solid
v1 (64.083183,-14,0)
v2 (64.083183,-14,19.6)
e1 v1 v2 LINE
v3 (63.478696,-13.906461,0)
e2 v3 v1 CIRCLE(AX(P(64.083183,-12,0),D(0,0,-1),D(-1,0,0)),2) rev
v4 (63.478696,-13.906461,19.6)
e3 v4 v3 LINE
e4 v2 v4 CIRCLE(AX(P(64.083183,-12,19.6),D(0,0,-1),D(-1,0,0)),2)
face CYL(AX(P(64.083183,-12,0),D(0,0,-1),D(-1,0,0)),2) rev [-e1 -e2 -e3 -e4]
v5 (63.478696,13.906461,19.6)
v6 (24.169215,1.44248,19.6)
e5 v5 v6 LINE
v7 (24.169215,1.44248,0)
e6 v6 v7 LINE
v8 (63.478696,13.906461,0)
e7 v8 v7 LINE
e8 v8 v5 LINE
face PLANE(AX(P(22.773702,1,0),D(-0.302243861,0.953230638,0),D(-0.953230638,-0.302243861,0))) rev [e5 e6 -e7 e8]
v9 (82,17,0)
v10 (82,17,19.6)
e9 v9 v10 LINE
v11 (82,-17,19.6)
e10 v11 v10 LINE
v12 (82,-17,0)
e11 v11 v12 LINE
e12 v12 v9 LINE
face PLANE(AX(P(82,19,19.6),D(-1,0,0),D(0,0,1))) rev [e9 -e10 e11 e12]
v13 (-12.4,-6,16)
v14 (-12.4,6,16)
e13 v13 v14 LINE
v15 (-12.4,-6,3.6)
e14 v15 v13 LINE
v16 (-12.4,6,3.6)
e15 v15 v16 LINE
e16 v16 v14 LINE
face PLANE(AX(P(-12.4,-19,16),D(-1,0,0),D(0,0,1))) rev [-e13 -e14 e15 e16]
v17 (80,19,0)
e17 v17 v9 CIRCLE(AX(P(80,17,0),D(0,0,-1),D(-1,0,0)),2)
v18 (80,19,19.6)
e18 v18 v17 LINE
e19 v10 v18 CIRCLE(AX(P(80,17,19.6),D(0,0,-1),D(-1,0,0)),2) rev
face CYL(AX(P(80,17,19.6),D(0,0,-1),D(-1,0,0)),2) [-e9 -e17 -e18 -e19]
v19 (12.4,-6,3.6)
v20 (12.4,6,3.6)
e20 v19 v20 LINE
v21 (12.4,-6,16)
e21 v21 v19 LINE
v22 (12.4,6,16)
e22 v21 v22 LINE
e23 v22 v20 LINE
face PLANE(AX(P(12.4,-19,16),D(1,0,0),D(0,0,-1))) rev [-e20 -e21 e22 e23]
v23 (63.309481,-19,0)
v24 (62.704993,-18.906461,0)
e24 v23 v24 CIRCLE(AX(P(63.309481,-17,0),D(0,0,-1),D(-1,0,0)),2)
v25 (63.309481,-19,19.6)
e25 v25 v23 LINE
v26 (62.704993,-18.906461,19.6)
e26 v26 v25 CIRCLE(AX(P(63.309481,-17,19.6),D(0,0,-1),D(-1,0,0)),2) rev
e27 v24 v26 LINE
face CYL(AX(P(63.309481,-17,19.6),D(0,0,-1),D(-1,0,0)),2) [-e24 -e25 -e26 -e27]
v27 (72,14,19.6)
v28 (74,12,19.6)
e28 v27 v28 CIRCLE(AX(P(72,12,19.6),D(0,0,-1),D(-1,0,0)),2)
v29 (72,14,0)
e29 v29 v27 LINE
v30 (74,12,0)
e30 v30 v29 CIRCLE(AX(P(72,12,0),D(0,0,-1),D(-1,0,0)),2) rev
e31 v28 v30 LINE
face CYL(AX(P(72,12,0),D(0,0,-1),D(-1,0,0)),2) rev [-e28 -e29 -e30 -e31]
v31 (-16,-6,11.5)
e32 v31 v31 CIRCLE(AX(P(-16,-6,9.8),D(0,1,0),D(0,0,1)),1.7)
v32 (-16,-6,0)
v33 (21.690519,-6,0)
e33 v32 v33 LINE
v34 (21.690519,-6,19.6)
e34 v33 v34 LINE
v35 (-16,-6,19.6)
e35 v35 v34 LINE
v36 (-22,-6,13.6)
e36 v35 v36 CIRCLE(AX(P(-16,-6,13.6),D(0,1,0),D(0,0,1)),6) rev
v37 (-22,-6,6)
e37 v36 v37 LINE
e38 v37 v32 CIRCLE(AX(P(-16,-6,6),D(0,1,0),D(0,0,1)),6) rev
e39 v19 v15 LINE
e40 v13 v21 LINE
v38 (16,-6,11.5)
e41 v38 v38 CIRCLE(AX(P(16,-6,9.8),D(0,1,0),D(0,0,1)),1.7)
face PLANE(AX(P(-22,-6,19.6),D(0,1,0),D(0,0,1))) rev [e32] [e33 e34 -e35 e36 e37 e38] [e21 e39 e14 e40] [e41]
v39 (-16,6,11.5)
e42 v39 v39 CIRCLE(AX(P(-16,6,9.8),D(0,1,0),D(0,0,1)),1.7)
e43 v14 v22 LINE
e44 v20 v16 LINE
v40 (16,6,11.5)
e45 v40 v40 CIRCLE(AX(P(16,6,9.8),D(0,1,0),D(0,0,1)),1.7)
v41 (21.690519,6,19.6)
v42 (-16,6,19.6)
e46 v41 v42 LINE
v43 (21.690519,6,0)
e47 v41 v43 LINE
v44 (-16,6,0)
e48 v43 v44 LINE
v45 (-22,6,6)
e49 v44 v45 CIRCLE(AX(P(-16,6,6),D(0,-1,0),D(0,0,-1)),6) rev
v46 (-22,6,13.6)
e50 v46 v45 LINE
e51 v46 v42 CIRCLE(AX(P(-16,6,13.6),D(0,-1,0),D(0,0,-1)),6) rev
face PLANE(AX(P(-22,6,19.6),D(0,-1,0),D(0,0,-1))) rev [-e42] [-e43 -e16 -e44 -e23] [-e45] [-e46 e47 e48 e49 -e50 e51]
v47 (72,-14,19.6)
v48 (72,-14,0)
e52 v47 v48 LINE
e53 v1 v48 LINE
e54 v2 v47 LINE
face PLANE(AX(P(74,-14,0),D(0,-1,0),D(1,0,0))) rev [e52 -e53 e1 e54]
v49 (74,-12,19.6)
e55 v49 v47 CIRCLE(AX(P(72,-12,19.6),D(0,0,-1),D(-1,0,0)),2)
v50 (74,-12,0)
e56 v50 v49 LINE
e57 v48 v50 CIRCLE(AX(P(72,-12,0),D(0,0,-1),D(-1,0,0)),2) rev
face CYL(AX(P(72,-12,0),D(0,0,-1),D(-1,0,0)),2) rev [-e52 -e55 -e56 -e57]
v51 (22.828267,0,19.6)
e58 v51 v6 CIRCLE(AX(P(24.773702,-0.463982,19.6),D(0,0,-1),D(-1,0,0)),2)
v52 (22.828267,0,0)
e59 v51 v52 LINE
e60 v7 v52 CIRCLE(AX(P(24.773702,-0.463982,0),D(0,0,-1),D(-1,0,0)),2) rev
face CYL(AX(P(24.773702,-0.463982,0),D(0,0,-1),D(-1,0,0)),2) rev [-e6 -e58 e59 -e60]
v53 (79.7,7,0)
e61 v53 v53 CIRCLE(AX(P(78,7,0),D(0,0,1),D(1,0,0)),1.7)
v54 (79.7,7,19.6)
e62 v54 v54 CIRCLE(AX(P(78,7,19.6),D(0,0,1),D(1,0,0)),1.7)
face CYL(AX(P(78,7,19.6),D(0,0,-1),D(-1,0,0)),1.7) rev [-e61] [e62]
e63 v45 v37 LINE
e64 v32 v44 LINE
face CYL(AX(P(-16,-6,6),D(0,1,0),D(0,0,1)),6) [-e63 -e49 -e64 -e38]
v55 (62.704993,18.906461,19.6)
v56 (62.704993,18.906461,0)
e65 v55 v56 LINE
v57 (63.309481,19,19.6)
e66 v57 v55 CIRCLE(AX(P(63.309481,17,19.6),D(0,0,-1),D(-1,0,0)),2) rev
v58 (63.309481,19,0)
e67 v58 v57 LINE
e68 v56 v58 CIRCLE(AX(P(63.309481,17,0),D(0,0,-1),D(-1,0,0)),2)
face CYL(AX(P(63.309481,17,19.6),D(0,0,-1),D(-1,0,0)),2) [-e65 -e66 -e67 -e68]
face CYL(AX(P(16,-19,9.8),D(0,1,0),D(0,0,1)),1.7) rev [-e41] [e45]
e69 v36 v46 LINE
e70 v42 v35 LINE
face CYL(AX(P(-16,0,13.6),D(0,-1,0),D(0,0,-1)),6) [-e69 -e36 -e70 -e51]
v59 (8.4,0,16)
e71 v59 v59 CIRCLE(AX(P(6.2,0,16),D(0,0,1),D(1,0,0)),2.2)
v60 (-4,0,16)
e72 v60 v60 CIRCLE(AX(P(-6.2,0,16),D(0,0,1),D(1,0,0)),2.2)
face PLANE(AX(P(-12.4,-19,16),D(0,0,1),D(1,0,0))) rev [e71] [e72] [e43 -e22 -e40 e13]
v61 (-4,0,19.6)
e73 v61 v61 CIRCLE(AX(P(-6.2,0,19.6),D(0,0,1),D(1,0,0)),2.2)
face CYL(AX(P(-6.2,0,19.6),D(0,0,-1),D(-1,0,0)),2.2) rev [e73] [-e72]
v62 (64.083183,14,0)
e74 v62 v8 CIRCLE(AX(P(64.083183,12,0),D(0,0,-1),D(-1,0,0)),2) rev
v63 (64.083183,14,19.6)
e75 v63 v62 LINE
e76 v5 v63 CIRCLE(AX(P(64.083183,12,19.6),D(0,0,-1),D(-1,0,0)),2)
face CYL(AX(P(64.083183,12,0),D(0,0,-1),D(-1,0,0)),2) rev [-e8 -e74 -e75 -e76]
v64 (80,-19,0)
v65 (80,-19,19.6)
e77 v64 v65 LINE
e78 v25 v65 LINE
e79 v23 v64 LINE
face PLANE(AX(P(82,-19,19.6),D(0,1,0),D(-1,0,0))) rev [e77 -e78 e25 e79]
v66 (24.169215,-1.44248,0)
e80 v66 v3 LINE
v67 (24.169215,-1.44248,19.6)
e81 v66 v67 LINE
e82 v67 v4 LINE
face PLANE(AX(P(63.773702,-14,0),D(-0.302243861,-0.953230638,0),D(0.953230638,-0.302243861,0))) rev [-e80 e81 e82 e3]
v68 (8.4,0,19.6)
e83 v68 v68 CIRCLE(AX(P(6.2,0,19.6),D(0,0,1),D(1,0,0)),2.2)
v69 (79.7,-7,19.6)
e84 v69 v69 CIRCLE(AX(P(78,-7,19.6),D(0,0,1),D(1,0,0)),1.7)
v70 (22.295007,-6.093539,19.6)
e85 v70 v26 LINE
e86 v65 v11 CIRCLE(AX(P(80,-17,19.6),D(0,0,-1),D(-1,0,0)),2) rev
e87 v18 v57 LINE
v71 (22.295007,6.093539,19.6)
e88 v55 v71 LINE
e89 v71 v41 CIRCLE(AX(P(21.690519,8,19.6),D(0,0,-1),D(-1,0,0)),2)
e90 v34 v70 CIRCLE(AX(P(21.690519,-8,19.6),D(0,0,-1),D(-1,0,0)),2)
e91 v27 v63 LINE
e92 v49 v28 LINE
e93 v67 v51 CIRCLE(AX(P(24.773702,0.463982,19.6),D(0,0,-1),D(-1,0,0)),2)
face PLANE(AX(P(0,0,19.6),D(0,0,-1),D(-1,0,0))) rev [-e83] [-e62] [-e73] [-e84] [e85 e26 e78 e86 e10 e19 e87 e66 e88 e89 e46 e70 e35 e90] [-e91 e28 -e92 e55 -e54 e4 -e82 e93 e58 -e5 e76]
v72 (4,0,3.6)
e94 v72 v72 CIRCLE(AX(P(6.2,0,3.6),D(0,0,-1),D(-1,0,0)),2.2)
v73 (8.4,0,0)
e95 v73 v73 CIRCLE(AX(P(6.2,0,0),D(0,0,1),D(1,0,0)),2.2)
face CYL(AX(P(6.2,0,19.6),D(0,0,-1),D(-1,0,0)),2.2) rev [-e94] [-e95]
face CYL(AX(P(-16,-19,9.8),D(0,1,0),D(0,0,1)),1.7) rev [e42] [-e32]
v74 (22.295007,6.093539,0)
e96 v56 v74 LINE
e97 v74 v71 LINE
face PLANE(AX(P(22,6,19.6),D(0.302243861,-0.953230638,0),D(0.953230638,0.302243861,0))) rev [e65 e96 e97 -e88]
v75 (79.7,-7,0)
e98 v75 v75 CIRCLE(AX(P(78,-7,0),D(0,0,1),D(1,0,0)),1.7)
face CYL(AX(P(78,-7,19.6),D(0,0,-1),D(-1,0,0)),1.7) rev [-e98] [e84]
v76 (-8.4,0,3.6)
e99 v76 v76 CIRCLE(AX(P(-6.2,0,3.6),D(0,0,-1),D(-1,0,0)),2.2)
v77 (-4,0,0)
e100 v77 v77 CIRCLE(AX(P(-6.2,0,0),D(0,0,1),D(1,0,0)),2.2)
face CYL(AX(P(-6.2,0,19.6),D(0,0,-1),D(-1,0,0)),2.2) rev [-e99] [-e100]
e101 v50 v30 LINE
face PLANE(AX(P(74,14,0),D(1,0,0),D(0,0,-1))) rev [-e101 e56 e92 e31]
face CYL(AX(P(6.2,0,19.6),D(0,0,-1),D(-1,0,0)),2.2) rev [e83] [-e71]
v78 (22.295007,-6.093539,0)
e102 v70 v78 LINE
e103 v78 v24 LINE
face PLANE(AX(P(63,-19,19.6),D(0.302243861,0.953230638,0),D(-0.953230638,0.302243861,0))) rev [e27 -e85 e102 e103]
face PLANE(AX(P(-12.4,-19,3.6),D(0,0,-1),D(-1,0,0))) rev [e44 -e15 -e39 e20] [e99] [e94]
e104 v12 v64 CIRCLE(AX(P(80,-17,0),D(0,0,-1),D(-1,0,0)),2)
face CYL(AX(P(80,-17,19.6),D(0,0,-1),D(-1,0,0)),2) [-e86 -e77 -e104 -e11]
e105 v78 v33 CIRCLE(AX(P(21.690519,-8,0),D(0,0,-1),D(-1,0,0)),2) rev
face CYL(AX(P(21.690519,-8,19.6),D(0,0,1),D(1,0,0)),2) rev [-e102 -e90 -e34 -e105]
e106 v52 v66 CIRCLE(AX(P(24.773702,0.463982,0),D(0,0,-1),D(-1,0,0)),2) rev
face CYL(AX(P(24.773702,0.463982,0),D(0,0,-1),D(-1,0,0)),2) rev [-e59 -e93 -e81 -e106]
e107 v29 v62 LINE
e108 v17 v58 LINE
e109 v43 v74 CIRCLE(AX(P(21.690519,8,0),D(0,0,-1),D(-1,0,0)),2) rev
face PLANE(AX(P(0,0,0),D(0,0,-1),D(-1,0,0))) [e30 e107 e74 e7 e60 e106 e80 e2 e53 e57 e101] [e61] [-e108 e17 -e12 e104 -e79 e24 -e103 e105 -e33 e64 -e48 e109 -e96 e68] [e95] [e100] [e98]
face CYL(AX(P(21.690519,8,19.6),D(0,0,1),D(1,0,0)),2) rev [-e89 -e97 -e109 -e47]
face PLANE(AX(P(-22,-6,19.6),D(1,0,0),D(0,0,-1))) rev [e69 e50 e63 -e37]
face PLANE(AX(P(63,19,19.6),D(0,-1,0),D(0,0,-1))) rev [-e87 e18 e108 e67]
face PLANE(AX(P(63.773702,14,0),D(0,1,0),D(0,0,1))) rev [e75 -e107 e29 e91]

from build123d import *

# Parameters (mm, degrees)
SKETCH_1_R          = 2.2
SKETCH_1_R_2        = 1.7
EXTRUDE_1_DEPTH     = 19.6
SKETCH_2_R          = 1.7
SKETCH_2_W          = 24.8
SKETCH_2_H          = 12.4
CUT_EXTRUDE_1_DEPTH = 88.938387522
CUT_EXTRUDE_2_DEPTH = 87.424302138
FILLET_1_R          = 2
FILLET_2_R          = 6


with BuildPart() as part:
    # 草图1 → 凸台-拉伸1 (new body)
    with BuildSketch(Plane.XY):
        Polygon((-22, -6), (22, -6), (63, -19), (82, -19), (82, 19), (63, 19), (22, 6), (-22, 6), align=None)
        with Locations((-6.2, 0)):
            Circle(SKETCH_1_R, mode=Mode.SUBTRACT)
        with Locations((6.2, 0)):
            Circle(SKETCH_1_R, mode=Mode.SUBTRACT)
        with Locations((78, 7)):
            Circle(SKETCH_1_R_2, mode=Mode.SUBTRACT)
        with Locations((78, -7)):
            Circle(SKETCH_1_R_2, mode=Mode.SUBTRACT)
    extrude(amount=EXTRUDE_1_DEPTH)

    # 草图2 → 切除-拉伸1 (cut, through all)
    with BuildSketch(Plane(origin=(0, 6, 0), x_dir=(1, 0, 0), z_dir=(0, 1, 0))):
        with Locations(Location((16, -9.8, 0), (0, 0, 270))):
            Circle(SKETCH_2_R)
        with Locations(Location((-16, -9.8, 0), (0, 0, 270))):
            Circle(SKETCH_2_R)
        with Locations((0, -9.8)):
            Rectangle(SKETCH_2_W, SKETCH_2_H)
    extrude(amount=-CUT_EXTRUDE_1_DEPTH, mode=Mode.SUBTRACT)

    # 草图3 → 切除-拉伸2 (cut, through all)
    with BuildSketch(Plane.XY.offset(19.6)):
        Polygon((74, 14), (74, -14), (63.773702437, -14), (22.773702437, -1), (22.773702437, 1), (63.773702437, 14), align=None)
    extrude(amount=-CUT_EXTRUDE_2_DEPTH, mode=Mode.SUBTRACT)

    # 圆角1
    # the kernel refuses this fillet: 2 mm, written as the material it adds along each edge
    with BuildSketch(Plane(origin=(74, 14, 19.6), x_dir=(-1, 0, 0), z_dir=(0, 0, -1))) as fillet_1_piece_1:
        with BuildLine():
            CenterArc((FILLET_1_R, -FILLET_1_R), FILLET_1_R, 90, 90)
            Line((0, -FILLET_1_R), (0, 0))
            Line((0, 0), (FILLET_1_R, 0))
        make_face()
    extrude(amount=19.6)
    with BuildSketch(Plane(origin=(63.773702437, 14, 19.6), x_dir=(1, 0, 0), z_dir=(0, 0, -1)), Plane(origin=(63.773702437, -14, 19.6), x_dir=(-0.9532306376993169, 0.30224386073393383, 0), z_dir=(0, 0, -1)), Plane(origin=(22, -6, 0), x_dir=(-1, 0, 0), z_dir=(0, 0, 1))) as fillet_1_piece_2:
        with BuildLine():
            CenterArc((FILLET_1_R * 0.154740487324, FILLET_1_R), FILLET_1_R, 252.407575438, 17.592424562)
            Line((-FILLET_1_R * 0.14750337341, FILLET_1_R * 0.0467693623007), (0, 0))
            Line((0, 0), (FILLET_1_R * 0.154740487324, 0))
        make_face()
    extrude(amount=19.6)
    with BuildSketch(Plane(origin=(74, -14, 19.6), x_dir=(-1, 0, 0), z_dir=(0, 0, -1))) as fillet_1_piece_3:
        with BuildLine():
            CenterArc((FILLET_1_R, FILLET_1_R), FILLET_1_R, 180, 90)
            Line((0, FILLET_1_R), (0, 0))
            Line((0, 0), (FILLET_1_R, 0))
        make_face()
    extrude(amount=19.6)
    with BuildSketch(Plane(origin=(22.773702437, 1, 19.6), x_dir=(0.9532306376993182, 0.30224386073392995, 0), z_dir=(0, 0, -1)), Plane(origin=(22.773702437, -1, 19.6), x_dir=(0, 1, 0), z_dir=(0, 0, -1))) as fillet_1_piece_4:
        with BuildLine():
            CenterArc((FILLET_1_R * 0.731990886225, FILLET_1_R), FILLET_1_R, 197.592424562, 72.407575438)
            Line((-FILLET_1_R * 0.221239751475, FILLET_1_R * 0.697756139266), (0, 0))
            Line((0, 0), (FILLET_1_R * 0.731990886225, 0))
        make_face()
    extrude(amount=19.6)
    with BuildSketch(Plane(origin=(22, 6, 0), x_dir=(-1, 0, 0), z_dir=(0, 0, 1))) as fillet_1_piece_5:
        with BuildLine():
            CenterArc((FILLET_1_R * 0.154740487324, -FILLET_1_R), FILLET_1_R, 90, 17.592424562)
            Line((-FILLET_1_R * 0.14750337341, -FILLET_1_R * 0.0467693623007), (0, 0))
            Line((0, 0), (FILLET_1_R * 0.154740487324, 0))
        make_face()
    extrude(amount=19.6)
    # the kernel refuses this fillet: 2 mm, written as the material it takes off along each edge
    with BuildSketch(Plane(origin=(82, -19, -5), x_dir=(-1, 0, 0), z_dir=(0, 0, 1)), Plane(origin=(82, 19, -5), x_dir=(0, -1, 0), z_dir=(0, 0, 1))) as fillet_1_2_piece_1:
        with BuildLine():
            CenterArc((FILLET_1_R, -FILLET_1_R), FILLET_1_R, 90, 90)
            Line((0, -FILLET_1_R), (0, 0))
            Line((0, 0), (FILLET_1_R, 0))
        make_face()
    extrude(amount=29.6, mode=Mode.SUBTRACT)
    with BuildSketch(Plane(origin=(63, -19, -0.773702437), x_dir=(-0.9532306376993186, 0.3022438607339286, 0), z_dir=(0, 0, 1))) as fillet_1_2_piece_2:
        with BuildLine():
            CenterArc((FILLET_1_R * 0.154740487324, -FILLET_1_R), FILLET_1_R, 90, 17.592424562)
            Line((-FILLET_1_R * 0.14750337341, -FILLET_1_R * 0.0467693623007), (0, 0))
            Line((0, 0), (FILLET_1_R * 0.154740487324, 0))
        make_face()
    extrude(amount=21.147404873, mode=Mode.SUBTRACT)
    with BuildSketch(Plane(origin=(63, 19, -0.773702437), x_dir=(-0.9532306376993186, -0.3022438607339286, 0), z_dir=(0, 0, 1))) as fillet_1_2_piece_3:
        with BuildLine():
            CenterArc((FILLET_1_R * 0.154740487324, FILLET_1_R), FILLET_1_R, 252.407575438, 17.592424562)
            Line((-FILLET_1_R * 0.14750337341, FILLET_1_R * 0.0467693623007), (0, 0))
            Line((0, 0), (FILLET_1_R * 0.154740487324, 0))
        make_face()
    extrude(amount=21.147404873, mode=Mode.SUBTRACT)

    # 圆角2
    fillet_2_edges = [part.edges().sort_by_distance(p)[0] for p in [
        (-22, 0, 0),
        (-22, 0, 19.6),
    ]]
    fillet(fillet_2_edges, radius=FILLET_2_R)


solid = part.part
